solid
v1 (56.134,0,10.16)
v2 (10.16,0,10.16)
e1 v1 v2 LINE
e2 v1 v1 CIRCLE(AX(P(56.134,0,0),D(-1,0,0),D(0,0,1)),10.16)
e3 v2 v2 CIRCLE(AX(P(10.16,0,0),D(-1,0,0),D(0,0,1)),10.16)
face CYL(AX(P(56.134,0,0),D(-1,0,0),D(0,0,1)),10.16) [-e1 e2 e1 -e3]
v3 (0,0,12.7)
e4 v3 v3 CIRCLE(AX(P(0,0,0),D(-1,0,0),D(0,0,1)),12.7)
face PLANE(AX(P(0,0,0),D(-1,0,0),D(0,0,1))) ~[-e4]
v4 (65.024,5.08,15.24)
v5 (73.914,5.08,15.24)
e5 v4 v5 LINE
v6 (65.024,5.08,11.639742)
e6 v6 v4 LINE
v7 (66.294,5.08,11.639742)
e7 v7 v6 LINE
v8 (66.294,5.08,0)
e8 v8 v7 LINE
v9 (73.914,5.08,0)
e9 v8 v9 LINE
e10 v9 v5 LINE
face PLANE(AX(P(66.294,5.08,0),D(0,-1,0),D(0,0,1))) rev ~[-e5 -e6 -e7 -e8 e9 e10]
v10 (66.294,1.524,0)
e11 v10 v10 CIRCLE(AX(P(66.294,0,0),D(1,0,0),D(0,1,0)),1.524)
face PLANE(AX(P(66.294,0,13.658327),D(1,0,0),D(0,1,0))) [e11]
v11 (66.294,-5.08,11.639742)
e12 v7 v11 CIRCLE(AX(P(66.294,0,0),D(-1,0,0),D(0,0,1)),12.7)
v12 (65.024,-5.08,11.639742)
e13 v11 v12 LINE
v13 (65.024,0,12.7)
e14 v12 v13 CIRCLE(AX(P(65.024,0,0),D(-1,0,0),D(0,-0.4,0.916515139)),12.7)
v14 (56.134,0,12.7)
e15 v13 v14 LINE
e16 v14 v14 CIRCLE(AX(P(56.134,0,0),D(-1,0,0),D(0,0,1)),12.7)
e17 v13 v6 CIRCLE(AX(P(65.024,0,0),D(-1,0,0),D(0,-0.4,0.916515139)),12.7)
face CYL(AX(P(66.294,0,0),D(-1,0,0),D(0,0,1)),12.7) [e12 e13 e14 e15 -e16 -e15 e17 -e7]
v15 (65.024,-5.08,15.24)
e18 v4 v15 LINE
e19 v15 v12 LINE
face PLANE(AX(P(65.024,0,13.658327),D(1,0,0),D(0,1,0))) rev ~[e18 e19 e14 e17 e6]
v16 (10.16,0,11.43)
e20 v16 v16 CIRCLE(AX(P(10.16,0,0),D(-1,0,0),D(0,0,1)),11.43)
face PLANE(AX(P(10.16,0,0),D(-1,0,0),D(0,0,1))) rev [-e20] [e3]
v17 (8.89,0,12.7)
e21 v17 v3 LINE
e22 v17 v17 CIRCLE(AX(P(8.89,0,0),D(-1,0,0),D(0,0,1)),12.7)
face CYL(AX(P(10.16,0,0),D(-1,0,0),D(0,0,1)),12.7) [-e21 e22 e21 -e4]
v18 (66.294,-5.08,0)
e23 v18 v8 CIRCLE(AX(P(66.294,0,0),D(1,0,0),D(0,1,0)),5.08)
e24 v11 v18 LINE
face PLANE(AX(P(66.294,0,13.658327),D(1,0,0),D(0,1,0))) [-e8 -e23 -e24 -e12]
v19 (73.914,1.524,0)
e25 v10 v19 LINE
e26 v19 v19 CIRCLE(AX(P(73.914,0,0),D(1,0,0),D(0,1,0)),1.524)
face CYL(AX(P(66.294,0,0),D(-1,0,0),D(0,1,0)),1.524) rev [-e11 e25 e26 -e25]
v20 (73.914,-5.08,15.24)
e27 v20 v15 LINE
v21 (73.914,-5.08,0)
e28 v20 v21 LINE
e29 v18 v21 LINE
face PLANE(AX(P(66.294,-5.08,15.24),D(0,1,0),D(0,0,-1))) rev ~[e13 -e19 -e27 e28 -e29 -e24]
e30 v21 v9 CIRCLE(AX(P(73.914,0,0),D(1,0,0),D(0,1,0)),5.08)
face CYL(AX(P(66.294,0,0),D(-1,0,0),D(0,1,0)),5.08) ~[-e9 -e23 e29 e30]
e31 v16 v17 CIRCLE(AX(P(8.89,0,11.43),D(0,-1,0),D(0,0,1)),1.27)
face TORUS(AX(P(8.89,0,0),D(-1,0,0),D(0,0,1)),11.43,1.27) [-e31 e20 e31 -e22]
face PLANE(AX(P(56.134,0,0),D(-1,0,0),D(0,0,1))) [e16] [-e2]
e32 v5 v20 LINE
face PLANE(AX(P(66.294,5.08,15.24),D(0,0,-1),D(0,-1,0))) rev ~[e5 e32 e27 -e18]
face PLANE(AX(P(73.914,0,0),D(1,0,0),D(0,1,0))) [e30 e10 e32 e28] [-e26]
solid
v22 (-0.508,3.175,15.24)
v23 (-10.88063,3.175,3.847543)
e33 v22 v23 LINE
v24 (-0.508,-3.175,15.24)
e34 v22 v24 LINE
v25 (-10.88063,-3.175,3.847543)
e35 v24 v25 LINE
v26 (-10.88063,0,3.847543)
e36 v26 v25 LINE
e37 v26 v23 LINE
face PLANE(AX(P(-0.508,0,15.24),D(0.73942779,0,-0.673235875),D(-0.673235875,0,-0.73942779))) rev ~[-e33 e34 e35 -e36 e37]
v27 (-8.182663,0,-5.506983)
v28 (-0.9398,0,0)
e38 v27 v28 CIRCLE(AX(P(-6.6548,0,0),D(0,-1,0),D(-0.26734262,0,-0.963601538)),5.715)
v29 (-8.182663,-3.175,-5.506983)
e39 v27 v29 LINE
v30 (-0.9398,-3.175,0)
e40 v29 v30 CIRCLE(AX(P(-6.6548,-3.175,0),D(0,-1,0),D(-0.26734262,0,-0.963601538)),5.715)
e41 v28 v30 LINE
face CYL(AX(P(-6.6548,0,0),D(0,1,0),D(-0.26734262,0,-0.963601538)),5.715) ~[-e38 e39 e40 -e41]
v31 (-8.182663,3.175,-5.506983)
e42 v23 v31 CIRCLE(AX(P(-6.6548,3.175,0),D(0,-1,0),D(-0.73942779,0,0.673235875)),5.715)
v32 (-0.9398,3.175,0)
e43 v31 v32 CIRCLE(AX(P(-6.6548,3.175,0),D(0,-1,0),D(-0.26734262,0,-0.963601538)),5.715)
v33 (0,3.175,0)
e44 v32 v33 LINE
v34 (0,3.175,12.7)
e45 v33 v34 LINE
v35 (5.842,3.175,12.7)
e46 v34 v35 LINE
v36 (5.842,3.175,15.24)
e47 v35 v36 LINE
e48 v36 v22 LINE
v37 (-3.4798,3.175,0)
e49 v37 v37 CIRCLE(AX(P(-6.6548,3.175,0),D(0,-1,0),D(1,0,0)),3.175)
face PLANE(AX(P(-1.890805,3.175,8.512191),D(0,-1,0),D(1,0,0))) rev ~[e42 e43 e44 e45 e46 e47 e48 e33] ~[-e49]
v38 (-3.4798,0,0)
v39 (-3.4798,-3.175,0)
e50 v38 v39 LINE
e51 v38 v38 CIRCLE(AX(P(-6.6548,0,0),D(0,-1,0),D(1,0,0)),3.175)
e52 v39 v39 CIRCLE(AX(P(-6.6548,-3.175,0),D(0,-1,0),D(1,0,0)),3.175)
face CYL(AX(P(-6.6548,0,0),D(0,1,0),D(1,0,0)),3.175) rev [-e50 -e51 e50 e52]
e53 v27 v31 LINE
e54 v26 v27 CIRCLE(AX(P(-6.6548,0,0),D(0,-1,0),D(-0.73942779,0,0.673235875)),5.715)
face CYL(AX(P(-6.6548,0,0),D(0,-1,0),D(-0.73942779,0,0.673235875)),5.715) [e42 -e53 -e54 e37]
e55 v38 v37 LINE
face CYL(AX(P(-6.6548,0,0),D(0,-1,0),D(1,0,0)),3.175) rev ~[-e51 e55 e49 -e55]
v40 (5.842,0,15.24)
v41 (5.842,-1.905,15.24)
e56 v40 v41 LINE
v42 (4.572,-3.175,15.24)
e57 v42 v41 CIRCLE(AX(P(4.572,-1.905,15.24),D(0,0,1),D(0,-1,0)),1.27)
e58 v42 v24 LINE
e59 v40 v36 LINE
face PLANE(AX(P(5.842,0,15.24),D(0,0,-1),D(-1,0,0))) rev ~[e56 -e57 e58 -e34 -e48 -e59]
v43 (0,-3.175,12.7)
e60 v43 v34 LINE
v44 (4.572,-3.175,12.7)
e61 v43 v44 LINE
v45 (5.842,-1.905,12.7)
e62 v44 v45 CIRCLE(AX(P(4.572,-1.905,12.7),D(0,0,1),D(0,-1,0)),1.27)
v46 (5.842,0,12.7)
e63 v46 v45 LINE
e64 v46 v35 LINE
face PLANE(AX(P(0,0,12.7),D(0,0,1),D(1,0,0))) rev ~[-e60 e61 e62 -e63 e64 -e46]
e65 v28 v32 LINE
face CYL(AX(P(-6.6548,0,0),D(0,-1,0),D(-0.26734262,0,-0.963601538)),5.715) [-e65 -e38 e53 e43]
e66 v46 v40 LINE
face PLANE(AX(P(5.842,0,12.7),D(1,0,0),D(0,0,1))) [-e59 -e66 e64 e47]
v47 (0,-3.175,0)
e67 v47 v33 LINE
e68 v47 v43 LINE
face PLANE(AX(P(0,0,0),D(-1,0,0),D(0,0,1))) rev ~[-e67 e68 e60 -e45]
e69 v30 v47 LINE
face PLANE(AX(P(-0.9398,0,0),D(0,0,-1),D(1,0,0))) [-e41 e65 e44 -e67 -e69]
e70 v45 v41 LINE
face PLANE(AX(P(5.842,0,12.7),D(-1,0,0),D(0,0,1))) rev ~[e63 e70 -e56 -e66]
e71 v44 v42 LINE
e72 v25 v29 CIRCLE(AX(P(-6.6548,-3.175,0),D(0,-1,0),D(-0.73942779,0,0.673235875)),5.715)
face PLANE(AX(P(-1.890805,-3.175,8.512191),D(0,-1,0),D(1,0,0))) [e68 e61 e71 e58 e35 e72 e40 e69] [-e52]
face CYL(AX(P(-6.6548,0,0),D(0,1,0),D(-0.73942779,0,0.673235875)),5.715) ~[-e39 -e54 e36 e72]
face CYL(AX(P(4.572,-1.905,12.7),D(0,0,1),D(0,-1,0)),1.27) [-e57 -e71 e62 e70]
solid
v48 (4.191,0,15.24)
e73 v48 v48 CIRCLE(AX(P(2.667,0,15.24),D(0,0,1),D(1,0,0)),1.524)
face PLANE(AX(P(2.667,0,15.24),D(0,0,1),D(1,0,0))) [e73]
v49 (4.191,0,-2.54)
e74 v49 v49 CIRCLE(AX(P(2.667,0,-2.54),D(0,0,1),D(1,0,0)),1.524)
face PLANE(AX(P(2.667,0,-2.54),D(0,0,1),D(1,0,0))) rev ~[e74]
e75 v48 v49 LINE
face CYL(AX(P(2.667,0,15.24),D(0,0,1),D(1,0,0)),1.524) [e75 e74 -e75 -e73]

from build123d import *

# Parameters (mm, degrees)
F0_W     = 5.842
F0_H     = 12.7
F0_R     = 3.175
F2_DEPTH = 3.175
F4_DEPTH = 1.27
F3_R     = 1.524
F5_DEPTH = 7.62
F6_R     = 1.524
F8_DEPTH = 17.78
F10_R    = 1.27
F11_R    = 1.27


# Not quite as in the source:
# - the program builds the solid bodies; features that only make, move or delete a surface that nothing else refers to are left out


with BuildPart() as f1:
    # F0 (on Front) → F1 (revolve)
    with BuildSketch(Plane.XZ):
        with Locations((2.921, 6.35)):
            Rectangle(F0_W, F0_H)
        Polygon((5.842, 12.7), (5.842, 0), (66.294, 0), (66.294, 12.7), (56.134, 12.7), (56.134, 10.16), (10.16, 10.16), (10.16, 12.7), align=None)
    revolve(axis=Axis((33.147, 0, 0), (-1, 0, 0)))

    # F3 (on face) → F4 (join)
    with BuildSketch(Plane.YZ.offset(66.294)):
        with BuildLine():
            ThreePointArc((-5.08, 11.6397422652), (0, 12.7), (5.08, 11.6397422652))
            Line((5.08, 11.6397422652), (5.08, 15.24))
            Line((5.08, 15.24), (-5.08, 15.24))
            Line((-5.08, 15.24), (-5.08, 11.6397422652))
        make_face()
    extrude(amount=-F4_DEPTH)

    # F3 (on face) → F5 (join)
    with BuildSketch(Plane.YZ.offset(66.294)):
        with BuildLine():
            ThreePointArc((-5.08, 0), (0, -5.08), (5.08, 0))
            ThreePointArc((5.08, 0), (0, 5.08), (-5.08, 0))
        make_face()
        Circle(F3_R, mode=Mode.SUBTRACT)
        with BuildLine():
            ThreePointArc((-5.08, 0), (0, 5.08), (5.08, 0))
            Line((5.08, 0), (5.08, 15.24))
            Line((5.08, 15.24), (-5.08, 15.24))
            Line((-5.08, 15.24), (-5.08, 0))
        make_face()
    extrude(amount=F5_DEPTH)

    # F10
    f10_edges = [f1.edges().sort_by_distance(p)[0] for p in [
        (10.16, 0, -12.7),
    ]]
    fillet(f10_edges, radius=F10_R)


with BuildPart() as f2:
    # F0 (on Front) → F2 (new body, symmetric)
    with BuildSketch(Plane.XZ):
        with BuildLine():
            Line((-0.9398, 0), (0, 0))
            Line((0, 0), (0, 12.7))
            Line((0, 12.7), (5.842, 12.7))
            Line((5.842, 12.7), (5.842, 15.24))
            Line((5.842, 15.24), (-0.508, 15.24))
            Line((-0.508, 15.24), (-10.8806298187, 3.8475430269))
            ThreePointArc((-10.8806298187, 3.8475430269), (-4.5919612295, 5.3297205562), (-0.9398, 0))
        make_face()
        with BuildLine():
            ThreePointArc((-8.1826630726, -5.5069827884), (-3.1957909266, -4.5493385486), (-0.9398, 0))
            ThreePointArc((-0.9398, 0), (-4.5919612295, 5.3297205562), (-10.8806298187, 3.8475430269))
            ThreePointArc((-10.8806298187, 3.8475430269), (-12.1459778134, -1.5837270034), (-8.1826630726, -5.5069827884))
        make_face()
        with Locations((-6.6548, 0)):
            Circle(F0_R, mode=Mode.SUBTRACT)
    extrude(amount=F2_DEPTH, both=True)

    # F11
    f11_edges = [f2.edges().sort_by_distance(p)[0] for p in [
        (5.842, -3.175, 13.97),
    ]]
    fillet(f11_edges, radius=F11_R)


with BuildPart() as f8:
    # F6 (on face) → F8 (new body)
    with BuildSketch(Plane.XY.offset(15.24)):
        with Locations((2.667, 0)):
            Circle(F6_R)
    extrude(amount=-F8_DEPTH)


solid = Compound([f1.part, f2.part, f8.part])
